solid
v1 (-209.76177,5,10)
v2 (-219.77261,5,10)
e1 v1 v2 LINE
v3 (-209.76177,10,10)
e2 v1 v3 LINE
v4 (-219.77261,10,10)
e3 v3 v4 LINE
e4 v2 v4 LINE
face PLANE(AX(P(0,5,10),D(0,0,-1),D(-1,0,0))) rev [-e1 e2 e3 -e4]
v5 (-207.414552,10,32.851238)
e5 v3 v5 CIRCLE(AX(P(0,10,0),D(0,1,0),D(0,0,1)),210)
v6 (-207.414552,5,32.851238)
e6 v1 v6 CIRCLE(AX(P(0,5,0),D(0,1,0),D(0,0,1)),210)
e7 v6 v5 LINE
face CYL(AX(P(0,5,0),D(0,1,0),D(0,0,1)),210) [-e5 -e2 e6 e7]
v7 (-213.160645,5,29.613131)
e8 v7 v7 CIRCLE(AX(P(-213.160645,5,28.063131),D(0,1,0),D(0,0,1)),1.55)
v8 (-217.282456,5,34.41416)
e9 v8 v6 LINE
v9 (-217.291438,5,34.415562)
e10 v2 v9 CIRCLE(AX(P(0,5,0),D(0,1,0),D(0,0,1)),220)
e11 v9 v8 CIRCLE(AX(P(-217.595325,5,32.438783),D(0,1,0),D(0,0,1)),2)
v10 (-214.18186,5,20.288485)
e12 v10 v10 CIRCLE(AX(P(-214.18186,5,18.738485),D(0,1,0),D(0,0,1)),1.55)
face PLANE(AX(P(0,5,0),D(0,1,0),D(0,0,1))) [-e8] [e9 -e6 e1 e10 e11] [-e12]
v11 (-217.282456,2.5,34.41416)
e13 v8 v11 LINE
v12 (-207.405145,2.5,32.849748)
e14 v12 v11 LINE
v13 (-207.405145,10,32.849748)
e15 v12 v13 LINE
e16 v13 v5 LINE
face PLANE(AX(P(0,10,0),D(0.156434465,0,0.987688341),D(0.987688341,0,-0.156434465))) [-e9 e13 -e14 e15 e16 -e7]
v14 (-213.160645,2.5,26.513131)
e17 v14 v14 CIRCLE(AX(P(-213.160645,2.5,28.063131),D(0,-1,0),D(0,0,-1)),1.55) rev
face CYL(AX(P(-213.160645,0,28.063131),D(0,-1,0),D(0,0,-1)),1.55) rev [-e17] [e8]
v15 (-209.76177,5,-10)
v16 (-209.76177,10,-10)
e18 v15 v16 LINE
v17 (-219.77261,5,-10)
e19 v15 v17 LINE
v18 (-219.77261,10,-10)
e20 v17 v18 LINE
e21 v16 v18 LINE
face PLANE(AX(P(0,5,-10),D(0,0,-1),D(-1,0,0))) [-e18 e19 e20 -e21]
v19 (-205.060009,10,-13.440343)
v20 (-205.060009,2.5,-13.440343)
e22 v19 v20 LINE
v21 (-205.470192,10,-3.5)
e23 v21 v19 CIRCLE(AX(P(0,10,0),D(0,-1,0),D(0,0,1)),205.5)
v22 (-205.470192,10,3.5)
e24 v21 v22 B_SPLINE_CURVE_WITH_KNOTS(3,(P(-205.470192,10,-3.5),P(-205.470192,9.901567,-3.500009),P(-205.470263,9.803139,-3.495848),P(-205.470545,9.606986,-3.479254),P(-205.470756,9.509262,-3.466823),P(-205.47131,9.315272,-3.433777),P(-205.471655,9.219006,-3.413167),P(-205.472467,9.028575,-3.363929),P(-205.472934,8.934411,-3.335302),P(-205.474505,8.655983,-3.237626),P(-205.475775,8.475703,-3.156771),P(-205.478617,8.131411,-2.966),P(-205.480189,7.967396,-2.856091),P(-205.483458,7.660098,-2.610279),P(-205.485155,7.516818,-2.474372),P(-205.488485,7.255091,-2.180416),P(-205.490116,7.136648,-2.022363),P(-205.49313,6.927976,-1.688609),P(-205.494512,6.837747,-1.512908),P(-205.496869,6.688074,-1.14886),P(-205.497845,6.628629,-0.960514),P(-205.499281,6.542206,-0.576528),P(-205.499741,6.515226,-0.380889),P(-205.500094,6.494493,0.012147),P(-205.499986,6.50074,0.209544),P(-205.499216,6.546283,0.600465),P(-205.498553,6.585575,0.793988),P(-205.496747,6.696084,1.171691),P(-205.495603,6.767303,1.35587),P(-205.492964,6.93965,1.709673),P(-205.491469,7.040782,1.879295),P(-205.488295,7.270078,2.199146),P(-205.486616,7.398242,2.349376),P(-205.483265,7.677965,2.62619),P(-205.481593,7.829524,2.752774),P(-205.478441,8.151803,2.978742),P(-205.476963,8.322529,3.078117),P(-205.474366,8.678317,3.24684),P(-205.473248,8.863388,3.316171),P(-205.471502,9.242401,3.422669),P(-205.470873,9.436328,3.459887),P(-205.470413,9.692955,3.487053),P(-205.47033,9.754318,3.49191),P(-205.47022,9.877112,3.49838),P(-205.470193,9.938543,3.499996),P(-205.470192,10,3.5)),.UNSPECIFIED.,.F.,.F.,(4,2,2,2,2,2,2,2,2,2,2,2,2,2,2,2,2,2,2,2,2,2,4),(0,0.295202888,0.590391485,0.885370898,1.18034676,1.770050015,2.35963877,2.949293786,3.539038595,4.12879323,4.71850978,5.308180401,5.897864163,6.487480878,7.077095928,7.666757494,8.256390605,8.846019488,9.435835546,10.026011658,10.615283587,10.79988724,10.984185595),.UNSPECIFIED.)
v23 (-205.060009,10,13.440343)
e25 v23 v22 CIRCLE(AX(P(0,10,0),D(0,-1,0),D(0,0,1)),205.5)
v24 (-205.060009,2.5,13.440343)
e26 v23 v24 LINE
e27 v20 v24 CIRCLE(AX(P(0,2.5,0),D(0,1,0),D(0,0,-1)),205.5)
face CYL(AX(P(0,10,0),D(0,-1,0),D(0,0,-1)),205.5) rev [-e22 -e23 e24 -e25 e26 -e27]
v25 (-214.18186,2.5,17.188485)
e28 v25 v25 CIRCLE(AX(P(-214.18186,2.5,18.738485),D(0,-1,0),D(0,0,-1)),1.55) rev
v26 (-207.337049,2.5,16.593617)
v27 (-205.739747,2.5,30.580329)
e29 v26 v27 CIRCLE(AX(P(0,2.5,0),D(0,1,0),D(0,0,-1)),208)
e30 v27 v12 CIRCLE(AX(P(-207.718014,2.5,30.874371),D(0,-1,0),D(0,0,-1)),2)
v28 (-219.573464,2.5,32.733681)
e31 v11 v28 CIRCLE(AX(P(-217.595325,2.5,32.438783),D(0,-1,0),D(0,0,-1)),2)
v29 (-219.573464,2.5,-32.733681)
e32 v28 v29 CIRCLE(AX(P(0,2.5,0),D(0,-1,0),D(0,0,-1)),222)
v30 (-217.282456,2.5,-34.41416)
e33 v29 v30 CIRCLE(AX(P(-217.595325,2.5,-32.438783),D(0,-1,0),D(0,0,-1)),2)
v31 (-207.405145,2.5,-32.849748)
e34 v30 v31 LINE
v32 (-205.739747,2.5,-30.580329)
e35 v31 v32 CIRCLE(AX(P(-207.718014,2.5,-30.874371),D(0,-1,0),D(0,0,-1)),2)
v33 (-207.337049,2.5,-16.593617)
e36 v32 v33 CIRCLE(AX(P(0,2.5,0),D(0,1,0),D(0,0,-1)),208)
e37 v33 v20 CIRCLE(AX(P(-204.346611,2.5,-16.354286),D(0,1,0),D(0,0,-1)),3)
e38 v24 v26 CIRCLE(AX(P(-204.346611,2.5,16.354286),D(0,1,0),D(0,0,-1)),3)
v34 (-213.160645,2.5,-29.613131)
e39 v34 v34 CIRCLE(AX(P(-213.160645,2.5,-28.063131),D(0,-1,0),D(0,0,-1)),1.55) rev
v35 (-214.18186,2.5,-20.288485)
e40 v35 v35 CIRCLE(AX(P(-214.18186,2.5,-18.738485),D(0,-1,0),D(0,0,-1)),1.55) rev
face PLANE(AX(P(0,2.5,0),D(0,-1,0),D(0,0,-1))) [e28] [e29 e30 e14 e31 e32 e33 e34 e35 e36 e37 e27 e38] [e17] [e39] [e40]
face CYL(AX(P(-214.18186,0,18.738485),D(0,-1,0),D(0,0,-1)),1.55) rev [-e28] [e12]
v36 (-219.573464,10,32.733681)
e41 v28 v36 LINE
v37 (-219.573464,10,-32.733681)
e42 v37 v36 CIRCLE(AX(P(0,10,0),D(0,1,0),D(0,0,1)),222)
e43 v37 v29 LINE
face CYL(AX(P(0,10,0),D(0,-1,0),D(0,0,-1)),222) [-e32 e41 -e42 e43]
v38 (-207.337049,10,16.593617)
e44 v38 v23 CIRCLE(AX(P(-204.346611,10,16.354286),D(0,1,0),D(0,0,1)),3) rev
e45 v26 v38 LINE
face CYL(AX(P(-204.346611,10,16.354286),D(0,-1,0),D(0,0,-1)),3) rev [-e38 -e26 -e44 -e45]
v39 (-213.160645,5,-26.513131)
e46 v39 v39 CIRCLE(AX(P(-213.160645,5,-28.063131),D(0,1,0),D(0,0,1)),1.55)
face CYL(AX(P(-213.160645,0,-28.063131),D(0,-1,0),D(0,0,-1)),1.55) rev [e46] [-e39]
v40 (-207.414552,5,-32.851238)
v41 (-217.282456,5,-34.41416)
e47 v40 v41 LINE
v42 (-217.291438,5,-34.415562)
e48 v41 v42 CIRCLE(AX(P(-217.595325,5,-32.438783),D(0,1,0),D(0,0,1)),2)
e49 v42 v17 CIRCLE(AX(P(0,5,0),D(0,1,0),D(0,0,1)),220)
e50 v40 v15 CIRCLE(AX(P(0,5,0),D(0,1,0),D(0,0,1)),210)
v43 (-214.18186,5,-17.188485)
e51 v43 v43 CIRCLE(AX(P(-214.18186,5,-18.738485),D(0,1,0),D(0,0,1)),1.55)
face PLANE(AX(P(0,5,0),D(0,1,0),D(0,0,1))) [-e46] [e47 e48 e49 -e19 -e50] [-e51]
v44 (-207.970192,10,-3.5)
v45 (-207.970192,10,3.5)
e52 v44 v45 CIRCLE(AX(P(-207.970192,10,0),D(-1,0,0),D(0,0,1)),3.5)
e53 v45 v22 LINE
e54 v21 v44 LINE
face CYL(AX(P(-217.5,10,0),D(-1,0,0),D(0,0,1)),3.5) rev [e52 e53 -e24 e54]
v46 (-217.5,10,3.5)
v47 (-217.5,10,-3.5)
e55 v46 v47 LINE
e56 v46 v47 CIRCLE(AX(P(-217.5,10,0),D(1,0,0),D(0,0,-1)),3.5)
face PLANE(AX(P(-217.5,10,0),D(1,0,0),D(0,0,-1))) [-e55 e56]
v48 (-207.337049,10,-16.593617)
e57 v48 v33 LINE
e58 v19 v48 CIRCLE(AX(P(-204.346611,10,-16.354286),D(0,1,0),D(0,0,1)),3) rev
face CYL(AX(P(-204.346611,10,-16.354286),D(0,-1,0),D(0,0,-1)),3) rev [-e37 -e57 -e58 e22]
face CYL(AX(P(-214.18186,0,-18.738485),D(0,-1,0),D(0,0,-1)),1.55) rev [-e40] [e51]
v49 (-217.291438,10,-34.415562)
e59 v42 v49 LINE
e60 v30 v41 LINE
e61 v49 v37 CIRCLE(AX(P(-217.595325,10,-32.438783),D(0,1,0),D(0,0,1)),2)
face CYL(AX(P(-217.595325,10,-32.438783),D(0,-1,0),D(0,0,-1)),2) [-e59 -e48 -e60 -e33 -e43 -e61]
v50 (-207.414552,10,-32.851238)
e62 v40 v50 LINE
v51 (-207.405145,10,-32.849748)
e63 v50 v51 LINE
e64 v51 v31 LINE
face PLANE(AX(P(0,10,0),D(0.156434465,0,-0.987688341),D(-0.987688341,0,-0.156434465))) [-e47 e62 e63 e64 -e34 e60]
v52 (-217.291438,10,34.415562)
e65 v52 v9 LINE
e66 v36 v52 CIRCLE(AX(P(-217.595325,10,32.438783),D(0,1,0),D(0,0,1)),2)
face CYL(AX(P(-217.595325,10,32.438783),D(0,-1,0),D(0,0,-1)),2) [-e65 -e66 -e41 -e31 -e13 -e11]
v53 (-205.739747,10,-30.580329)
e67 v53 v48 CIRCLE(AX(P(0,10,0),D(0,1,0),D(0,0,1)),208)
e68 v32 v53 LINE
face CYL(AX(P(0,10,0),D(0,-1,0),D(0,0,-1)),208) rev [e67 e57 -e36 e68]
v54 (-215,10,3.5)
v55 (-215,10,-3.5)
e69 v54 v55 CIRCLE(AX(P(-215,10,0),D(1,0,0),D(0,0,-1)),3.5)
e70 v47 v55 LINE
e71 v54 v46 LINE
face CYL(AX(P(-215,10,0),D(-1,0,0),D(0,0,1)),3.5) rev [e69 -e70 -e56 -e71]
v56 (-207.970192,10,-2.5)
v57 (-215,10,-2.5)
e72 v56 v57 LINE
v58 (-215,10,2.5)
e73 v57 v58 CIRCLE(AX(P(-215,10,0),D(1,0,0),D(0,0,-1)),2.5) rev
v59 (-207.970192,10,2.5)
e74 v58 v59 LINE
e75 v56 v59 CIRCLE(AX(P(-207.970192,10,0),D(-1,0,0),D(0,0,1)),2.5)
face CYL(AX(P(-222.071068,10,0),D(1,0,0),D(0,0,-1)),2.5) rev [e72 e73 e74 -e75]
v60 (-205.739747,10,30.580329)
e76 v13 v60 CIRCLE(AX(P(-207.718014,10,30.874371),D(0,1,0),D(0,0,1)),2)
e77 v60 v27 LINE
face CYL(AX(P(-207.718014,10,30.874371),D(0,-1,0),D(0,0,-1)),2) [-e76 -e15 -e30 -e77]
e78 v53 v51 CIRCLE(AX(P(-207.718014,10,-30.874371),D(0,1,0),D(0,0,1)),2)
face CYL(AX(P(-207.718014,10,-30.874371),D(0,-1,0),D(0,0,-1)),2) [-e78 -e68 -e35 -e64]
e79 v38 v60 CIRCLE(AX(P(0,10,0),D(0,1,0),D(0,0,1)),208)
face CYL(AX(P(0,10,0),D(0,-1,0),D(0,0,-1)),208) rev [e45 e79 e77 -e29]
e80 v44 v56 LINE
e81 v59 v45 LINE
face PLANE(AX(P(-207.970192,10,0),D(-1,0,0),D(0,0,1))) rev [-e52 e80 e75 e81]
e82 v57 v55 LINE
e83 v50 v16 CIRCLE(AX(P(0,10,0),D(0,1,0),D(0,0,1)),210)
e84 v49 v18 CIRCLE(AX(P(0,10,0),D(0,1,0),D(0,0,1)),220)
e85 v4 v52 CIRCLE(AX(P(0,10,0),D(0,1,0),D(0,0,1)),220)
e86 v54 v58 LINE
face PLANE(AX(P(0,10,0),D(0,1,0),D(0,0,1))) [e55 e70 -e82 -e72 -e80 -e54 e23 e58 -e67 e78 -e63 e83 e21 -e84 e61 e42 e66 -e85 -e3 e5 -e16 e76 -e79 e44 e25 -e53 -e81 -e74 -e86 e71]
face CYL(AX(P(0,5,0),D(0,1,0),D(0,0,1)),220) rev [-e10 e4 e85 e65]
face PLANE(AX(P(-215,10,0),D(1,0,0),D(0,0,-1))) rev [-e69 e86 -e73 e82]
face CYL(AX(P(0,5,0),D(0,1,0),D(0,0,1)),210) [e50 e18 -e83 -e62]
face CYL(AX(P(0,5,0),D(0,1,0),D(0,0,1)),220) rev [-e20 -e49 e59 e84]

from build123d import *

# Parameters (mm, degrees)
BOSS_EXTRUDE1_DEPTH        = 10
CUT_EXTRUDE1_DEPTH         = 5
F_3_1_3_1_DIAMETER_HOLE2_D = 3.1
BOSS_EXTRUDE2_DEPTH        = 10
FILLET1_R                  = 3
FILLET2_R                  = 2
CUT_EXTRUDE6_DEPTH         = 2.5
SKETCH28_R                 = 3.5000000000000004
CUT_EXTRUDE7_DEPTH         = 2.5
SKETCH29_W                 = 2.5
SKETCH29_H                 = 3.5000000000000004
SKETCH30_R                 = 2.5000000000000004
CUT_EXTRUDE8_DEPTH         = 7.029807515


with BuildPart() as part:
    # Sketch1 → Boss-Extrude1 (new body)
    with BuildSketch(Plane(origin=(0, 0, 0), x_dir=(1, 0, 0), z_dir=(0, 1, 0))):
        with BuildLine():
            ThreePointArc((-207.41455152497886, 32.851237658448525), (-209.99999999999994, 2.572e-14), (-207.41455152497886, -32.85123765844857))
            Line((-207.41455152497886, -32.85123765844857), (-217.29143493093028, -34.41558230885091))
            ThreePointArc((-217.29143493093028, -34.41558230885091), (-220, 2.694e-14), (-217.29143493093028, 34.415582308850865))
            Line((-217.29143493093028, 34.415582308850865), (-207.41455152497886, 32.851237658448525))
        make_face()
        with BuildLine():
            ThreePointArc((-217.2914349309303, -34.415582308850915), (-219.99999999999997, -1.421e-14), (-217.2914349309303, 34.415582308850865))
            Line((-217.29143493093028, 34.41558230885082), (-219.26681161212053, 34.72845123893128))
            ThreePointArc((-219.26681161212053, 34.72845123893128), (-221.99999999999997, -2.665e-14), (-219.26681161212053, -34.72845123893134))
            Line((-219.26681161212053, -34.728451238931335), (-217.29143493093028, -34.41558230885088))
        make_face()
        with BuildLine():
            Line((-205.4391748437886, 32.538368728368056), (-207.41455152497886, 32.85123765844851))
            ThreePointArc((-207.41455152497886, 32.851237658448525), (-209.99999999999994, -2.132e-14), (-207.41455152497886, -32.85123765844859))
            Line((-207.41455152497886, -32.85123765844857), (-205.4391748437886, -32.53836872836811))
            ThreePointArc((-205.43917484378863, -32.53836872836813), (-207.99999999999997, -2.842e-14), (-205.43917484378863, 32.538368728368056))
        make_face()
    extrude(amount=BOSS_EXTRUDE1_DEPTH)

    # Sketch15 → Cut-Extrude1 (cut)
    with BuildSketch(Plane(origin=(0, 10, 0), x_dir=(1, 0, 0), z_dir=(0, 1, 0))):
        with BuildLine():
            Line((-219.7726097583591, 9.999999999999972), (-209.76176963403066, 9.999999999999972))
            ThreePointArc((-209.76176963403046, 9.999999999995824), (-208.90085088283388, 21.457737542154447), (-207.41455152497886, 32.851237658448504))
            Line((-207.41455152497886, 32.851237658448504), (-217.29143493093028, 34.41558230885091))
            ThreePointArc((-217.2914349309303, 34.41558230885091), (-218.8727368927212, 22.242415450882426), (-219.7726097583591, 10.000000000000421))
        make_face()
        with BuildLine():
            ThreePointArc((-207.4145515249789, -32.85123765844855), (-208.90085088283385, -21.457737542154504), (-209.76176963403046, -9.999999999995891))
            Line((-209.76176963403066, -10.000000000000028), (-219.77260975835907, -10.00000000000003))
            ThreePointArc((-219.7726097583591, -10.000000000000506), (-218.8727368927212, -22.242415450882447), (-217.2914349309303, -34.41558230885088))
            Line((-217.29143493093028, -34.41558230885086), (-207.41455152497886, -32.85123765844855))
        make_face()
    extrude(amount=-CUT_EXTRUDE1_DEPTH, mode=Mode.SUBTRACT)

    # Ø3.1 (3.1) Diameter Hole2 (through all)
    with Locations(Plane(origin=(0, 0, 0), x_dir=(-1, 0, 0), z_dir=(0, -1, 0))):
        with Locations((213.160645195, -28.063131327), (214.18186009, -18.738484691), (214.18186009, 18.738484691), (213.160645195, 28.063131327)):
            Hole(F_3_1_3_1_DIAMETER_HOLE2_D / 2)

    # Sketch19 → Boss-Extrude2 (add)
    with BuildSketch(Plane(origin=(0, 0, 0), x_dir=(1, 0, 0), z_dir=(0, 1, 0))):
        with BuildLine():
            Line((-205.06000872553298, -13.44034305679455), (-207.55465603362947, -13.603850879869908))
            ThreePointArc((-207.55465603362947, -13.603850879869908), (-207.99999999999994, 2.547e-14), (-207.55465603362947, 13.603850879869857))
            Line((-207.55465603362947, 13.603850879869857), (-205.06000872553298, 13.440343056794502))
            ThreePointArc((-205.06000872553298, 13.440343056794502), (-205.49999999999997, 2.517e-14), (-205.06000872553298, -13.44034305679455))
        make_face()
    extrude(amount=BOSS_EXTRUDE2_DEPTH)

    # Fillet1
    # the kernel refuses this fillet: 3 mm, written as the material it adds along each edge
    with BuildSketch(Plane(origin=(-207.5546560336295, 0, -13.60385087986986), x_dir=(0.07259195171826252, 0, -0.9973617240228008), z_dir=(0, 1, 0))) as fillet1_piece_1:
        with BuildLine():
            CenterArc((2.97605695844059, -2.9999221104362666), FILLET1_R, 89.58712595875737, 80.81905726138756)
            Line((0.01801487263020066, -2.4999350920302814), (-0.04114596908600657, -2.489935351662162))
            ThreePointArc((-0.04114596908600657, -2.489935351662162), (-0.05099100589383556, -1.2503999029582549), (-0.05999844220872477, -0.00043235694312724))
            Line((-0.05999844220872477, -0.00043235694312724), (-0.00043235694311419, 0.05999844220871681))
            ThreePointArc((-0.00043235694311419, 0.05999844220871681), (1.4988374027981592, 0.06540034308590705), (2.998107162539448, 0.05999844220873665))
            Line((2.998107162539448, 0.05999844220873665), (2.9976748055963345, 1e-17))
        make_face()
    extrude(amount=10)
    with BuildSketch(Plane(origin=(-207.5546560336295, 0, 13.60385087986991), x_dir=(0.07259195171826295, 0, 0.9973617240228008), z_dir=(0, 1, 0))) as fillet1_piece_2:
        with BuildLine():
            CenterArc((2.9760569584405734, 2.9999221104362666), FILLET1_R, 189.5938167798556, 80.819057261387)
            Line((0.01801487263018374, 2.4999350920302543), (-0.04114596908602352, 2.4899353516621354))
            ThreePointArc((-0.04114596908602352, 2.4899353516621354), (-0.05099100589383325, 1.2503999029582546), (-0.05999844220872477, 0.00043235694312726))
            Line((-0.05999844220872477, 0.00043235694312726), (-0.00043235694311422, -0.05999844220871681))
            ThreePointArc((-0.00043235694311422, -0.05999844220871681), (1.498837402798161, -0.06540034308590782), (2.9981071625394304, -0.05999844220873665))
            Line((2.9981071625394304, -0.05999844220873665), (2.9976748055963167, 0))
        make_face()
    extrude(amount=10)

    # Fillet2
    fillet2_edges = [part.edges().sort_by_distance(p)[0] for p in [
        (-219.26681161212053, 5, 34.72845123893134),
        (-219.26681161212053, 5, -34.728451238931285),
        (-205.43917484378863, 5, -32.538368728368056),
        (-205.43917484378863, 5, 32.53836872836813),
    ]]
    fillet(fillet2_edges, radius=FILLET2_R)

    # Sketch26 → Cut-Extrude6 (cut)
    with BuildSketch(Plane.XZ):
        with BuildLine():
            Line((-217.28245576049179, -34.41416014796698), (-207.40514475604385, -32.849747772616084))
            ThreePointArc((-207.40514475604385, -32.849747772616084), (-206.1055960612061, -32.057633278286005), (-205.73974688911358, -30.580329461983652))
            ThreePointArc((-205.73974688911358, -30.580329461983652), (-206.65676096006328, -23.600490450312087), (-207.33704896887454, -16.593616992039934))
            ThreePointArc((-207.33704896887454, -16.593616992039934), (-206.7787671555463, -14.597978692482226), (-205.06000872553278, -13.440343056794774))
            ThreePointArc((-205.06000872553278, -13.440343056794774), (-205.5, -6.609e-14), (-205.060008725533, 13.440343056794593))
            ThreePointArc((-205.060008725533, 13.440343056794593), (-206.77876715554575, 14.597978692481712), (-207.3370489688746, 16.593616992038744))
            ThreePointArc((-207.3370489688746, 16.593616992038744), (-206.6567609600633, 23.60049045031153), (-205.73974688911358, 30.580329461983624))
            ThreePointArc((-205.73974688911358, 30.580329461983624), (-206.10559606120609, 32.057633278286005), (-207.40514475604385, 32.84974777261609))
            Line((-207.40514475604385, 32.84974777261609), (-217.28245576049179, 34.41416014796698))
            ThreePointArc((-217.28245576049179, 34.41416014796698), (-218.7782378264501, 34.05145718237069), (-219.57346400594108, 32.7336814982928))
            ThreePointArc((-219.57346400594108, 32.7336814982928), (-221.99999999999994, 1.2577e-13), (-219.5734640059411, -32.733681498292746))
            ThreePointArc((-219.5734640059411, -32.733681498292746), (-218.7782378264501, -34.051457182370655), (-217.28245576049179, -34.41416014796698))
        make_face()
    extrude(amount=-CUT_EXTRUDE6_DEPTH, mode=Mode.SUBTRACT)

    # Sketch28 → Cut-Extrude7 (cut)
    with BuildSketch(Plane(origin=(-217.5, 0, 0), x_dir=(0, 0, -1), z_dir=(1, 0, 0))):
        with Locations((-2.082e-14, 10)):
            Circle(SKETCH28_R)
    extrude(amount=CUT_EXTRUDE7_DEPTH, mode=Mode.SUBTRACT)

    # Sketch29 → Cut-Revolve1 (revolve, cut)
    with BuildSketch(Plane(origin=(0, 10, 0), x_dir=(1, 0, 0), z_dir=(0, 1, 0))):
        with Locations((-206.72019248543083, -1.7500000000000002)):
            Rectangle(SKETCH29_W, SKETCH29_H)
    revolve(axis=Axis((-217.5, 10, 1.53e-15), (1, 0, -1.2e-16)), mode=Mode.SUBTRACT)

    # Sketch30 → Cut-Extrude8 (cut)
    with BuildSketch(Plane(origin=(-207.97019248543083, 0, 2.547e-14), x_dir=(-1.2e-16, 0, -1), z_dir=(1, 0, -1.2e-16))):
        with Locations((2.515e-14, 10)):
            Circle(SKETCH30_R)
    extrude(amount=-CUT_EXTRUDE8_DEPTH, mode=Mode.SUBTRACT)


solid = part.part
